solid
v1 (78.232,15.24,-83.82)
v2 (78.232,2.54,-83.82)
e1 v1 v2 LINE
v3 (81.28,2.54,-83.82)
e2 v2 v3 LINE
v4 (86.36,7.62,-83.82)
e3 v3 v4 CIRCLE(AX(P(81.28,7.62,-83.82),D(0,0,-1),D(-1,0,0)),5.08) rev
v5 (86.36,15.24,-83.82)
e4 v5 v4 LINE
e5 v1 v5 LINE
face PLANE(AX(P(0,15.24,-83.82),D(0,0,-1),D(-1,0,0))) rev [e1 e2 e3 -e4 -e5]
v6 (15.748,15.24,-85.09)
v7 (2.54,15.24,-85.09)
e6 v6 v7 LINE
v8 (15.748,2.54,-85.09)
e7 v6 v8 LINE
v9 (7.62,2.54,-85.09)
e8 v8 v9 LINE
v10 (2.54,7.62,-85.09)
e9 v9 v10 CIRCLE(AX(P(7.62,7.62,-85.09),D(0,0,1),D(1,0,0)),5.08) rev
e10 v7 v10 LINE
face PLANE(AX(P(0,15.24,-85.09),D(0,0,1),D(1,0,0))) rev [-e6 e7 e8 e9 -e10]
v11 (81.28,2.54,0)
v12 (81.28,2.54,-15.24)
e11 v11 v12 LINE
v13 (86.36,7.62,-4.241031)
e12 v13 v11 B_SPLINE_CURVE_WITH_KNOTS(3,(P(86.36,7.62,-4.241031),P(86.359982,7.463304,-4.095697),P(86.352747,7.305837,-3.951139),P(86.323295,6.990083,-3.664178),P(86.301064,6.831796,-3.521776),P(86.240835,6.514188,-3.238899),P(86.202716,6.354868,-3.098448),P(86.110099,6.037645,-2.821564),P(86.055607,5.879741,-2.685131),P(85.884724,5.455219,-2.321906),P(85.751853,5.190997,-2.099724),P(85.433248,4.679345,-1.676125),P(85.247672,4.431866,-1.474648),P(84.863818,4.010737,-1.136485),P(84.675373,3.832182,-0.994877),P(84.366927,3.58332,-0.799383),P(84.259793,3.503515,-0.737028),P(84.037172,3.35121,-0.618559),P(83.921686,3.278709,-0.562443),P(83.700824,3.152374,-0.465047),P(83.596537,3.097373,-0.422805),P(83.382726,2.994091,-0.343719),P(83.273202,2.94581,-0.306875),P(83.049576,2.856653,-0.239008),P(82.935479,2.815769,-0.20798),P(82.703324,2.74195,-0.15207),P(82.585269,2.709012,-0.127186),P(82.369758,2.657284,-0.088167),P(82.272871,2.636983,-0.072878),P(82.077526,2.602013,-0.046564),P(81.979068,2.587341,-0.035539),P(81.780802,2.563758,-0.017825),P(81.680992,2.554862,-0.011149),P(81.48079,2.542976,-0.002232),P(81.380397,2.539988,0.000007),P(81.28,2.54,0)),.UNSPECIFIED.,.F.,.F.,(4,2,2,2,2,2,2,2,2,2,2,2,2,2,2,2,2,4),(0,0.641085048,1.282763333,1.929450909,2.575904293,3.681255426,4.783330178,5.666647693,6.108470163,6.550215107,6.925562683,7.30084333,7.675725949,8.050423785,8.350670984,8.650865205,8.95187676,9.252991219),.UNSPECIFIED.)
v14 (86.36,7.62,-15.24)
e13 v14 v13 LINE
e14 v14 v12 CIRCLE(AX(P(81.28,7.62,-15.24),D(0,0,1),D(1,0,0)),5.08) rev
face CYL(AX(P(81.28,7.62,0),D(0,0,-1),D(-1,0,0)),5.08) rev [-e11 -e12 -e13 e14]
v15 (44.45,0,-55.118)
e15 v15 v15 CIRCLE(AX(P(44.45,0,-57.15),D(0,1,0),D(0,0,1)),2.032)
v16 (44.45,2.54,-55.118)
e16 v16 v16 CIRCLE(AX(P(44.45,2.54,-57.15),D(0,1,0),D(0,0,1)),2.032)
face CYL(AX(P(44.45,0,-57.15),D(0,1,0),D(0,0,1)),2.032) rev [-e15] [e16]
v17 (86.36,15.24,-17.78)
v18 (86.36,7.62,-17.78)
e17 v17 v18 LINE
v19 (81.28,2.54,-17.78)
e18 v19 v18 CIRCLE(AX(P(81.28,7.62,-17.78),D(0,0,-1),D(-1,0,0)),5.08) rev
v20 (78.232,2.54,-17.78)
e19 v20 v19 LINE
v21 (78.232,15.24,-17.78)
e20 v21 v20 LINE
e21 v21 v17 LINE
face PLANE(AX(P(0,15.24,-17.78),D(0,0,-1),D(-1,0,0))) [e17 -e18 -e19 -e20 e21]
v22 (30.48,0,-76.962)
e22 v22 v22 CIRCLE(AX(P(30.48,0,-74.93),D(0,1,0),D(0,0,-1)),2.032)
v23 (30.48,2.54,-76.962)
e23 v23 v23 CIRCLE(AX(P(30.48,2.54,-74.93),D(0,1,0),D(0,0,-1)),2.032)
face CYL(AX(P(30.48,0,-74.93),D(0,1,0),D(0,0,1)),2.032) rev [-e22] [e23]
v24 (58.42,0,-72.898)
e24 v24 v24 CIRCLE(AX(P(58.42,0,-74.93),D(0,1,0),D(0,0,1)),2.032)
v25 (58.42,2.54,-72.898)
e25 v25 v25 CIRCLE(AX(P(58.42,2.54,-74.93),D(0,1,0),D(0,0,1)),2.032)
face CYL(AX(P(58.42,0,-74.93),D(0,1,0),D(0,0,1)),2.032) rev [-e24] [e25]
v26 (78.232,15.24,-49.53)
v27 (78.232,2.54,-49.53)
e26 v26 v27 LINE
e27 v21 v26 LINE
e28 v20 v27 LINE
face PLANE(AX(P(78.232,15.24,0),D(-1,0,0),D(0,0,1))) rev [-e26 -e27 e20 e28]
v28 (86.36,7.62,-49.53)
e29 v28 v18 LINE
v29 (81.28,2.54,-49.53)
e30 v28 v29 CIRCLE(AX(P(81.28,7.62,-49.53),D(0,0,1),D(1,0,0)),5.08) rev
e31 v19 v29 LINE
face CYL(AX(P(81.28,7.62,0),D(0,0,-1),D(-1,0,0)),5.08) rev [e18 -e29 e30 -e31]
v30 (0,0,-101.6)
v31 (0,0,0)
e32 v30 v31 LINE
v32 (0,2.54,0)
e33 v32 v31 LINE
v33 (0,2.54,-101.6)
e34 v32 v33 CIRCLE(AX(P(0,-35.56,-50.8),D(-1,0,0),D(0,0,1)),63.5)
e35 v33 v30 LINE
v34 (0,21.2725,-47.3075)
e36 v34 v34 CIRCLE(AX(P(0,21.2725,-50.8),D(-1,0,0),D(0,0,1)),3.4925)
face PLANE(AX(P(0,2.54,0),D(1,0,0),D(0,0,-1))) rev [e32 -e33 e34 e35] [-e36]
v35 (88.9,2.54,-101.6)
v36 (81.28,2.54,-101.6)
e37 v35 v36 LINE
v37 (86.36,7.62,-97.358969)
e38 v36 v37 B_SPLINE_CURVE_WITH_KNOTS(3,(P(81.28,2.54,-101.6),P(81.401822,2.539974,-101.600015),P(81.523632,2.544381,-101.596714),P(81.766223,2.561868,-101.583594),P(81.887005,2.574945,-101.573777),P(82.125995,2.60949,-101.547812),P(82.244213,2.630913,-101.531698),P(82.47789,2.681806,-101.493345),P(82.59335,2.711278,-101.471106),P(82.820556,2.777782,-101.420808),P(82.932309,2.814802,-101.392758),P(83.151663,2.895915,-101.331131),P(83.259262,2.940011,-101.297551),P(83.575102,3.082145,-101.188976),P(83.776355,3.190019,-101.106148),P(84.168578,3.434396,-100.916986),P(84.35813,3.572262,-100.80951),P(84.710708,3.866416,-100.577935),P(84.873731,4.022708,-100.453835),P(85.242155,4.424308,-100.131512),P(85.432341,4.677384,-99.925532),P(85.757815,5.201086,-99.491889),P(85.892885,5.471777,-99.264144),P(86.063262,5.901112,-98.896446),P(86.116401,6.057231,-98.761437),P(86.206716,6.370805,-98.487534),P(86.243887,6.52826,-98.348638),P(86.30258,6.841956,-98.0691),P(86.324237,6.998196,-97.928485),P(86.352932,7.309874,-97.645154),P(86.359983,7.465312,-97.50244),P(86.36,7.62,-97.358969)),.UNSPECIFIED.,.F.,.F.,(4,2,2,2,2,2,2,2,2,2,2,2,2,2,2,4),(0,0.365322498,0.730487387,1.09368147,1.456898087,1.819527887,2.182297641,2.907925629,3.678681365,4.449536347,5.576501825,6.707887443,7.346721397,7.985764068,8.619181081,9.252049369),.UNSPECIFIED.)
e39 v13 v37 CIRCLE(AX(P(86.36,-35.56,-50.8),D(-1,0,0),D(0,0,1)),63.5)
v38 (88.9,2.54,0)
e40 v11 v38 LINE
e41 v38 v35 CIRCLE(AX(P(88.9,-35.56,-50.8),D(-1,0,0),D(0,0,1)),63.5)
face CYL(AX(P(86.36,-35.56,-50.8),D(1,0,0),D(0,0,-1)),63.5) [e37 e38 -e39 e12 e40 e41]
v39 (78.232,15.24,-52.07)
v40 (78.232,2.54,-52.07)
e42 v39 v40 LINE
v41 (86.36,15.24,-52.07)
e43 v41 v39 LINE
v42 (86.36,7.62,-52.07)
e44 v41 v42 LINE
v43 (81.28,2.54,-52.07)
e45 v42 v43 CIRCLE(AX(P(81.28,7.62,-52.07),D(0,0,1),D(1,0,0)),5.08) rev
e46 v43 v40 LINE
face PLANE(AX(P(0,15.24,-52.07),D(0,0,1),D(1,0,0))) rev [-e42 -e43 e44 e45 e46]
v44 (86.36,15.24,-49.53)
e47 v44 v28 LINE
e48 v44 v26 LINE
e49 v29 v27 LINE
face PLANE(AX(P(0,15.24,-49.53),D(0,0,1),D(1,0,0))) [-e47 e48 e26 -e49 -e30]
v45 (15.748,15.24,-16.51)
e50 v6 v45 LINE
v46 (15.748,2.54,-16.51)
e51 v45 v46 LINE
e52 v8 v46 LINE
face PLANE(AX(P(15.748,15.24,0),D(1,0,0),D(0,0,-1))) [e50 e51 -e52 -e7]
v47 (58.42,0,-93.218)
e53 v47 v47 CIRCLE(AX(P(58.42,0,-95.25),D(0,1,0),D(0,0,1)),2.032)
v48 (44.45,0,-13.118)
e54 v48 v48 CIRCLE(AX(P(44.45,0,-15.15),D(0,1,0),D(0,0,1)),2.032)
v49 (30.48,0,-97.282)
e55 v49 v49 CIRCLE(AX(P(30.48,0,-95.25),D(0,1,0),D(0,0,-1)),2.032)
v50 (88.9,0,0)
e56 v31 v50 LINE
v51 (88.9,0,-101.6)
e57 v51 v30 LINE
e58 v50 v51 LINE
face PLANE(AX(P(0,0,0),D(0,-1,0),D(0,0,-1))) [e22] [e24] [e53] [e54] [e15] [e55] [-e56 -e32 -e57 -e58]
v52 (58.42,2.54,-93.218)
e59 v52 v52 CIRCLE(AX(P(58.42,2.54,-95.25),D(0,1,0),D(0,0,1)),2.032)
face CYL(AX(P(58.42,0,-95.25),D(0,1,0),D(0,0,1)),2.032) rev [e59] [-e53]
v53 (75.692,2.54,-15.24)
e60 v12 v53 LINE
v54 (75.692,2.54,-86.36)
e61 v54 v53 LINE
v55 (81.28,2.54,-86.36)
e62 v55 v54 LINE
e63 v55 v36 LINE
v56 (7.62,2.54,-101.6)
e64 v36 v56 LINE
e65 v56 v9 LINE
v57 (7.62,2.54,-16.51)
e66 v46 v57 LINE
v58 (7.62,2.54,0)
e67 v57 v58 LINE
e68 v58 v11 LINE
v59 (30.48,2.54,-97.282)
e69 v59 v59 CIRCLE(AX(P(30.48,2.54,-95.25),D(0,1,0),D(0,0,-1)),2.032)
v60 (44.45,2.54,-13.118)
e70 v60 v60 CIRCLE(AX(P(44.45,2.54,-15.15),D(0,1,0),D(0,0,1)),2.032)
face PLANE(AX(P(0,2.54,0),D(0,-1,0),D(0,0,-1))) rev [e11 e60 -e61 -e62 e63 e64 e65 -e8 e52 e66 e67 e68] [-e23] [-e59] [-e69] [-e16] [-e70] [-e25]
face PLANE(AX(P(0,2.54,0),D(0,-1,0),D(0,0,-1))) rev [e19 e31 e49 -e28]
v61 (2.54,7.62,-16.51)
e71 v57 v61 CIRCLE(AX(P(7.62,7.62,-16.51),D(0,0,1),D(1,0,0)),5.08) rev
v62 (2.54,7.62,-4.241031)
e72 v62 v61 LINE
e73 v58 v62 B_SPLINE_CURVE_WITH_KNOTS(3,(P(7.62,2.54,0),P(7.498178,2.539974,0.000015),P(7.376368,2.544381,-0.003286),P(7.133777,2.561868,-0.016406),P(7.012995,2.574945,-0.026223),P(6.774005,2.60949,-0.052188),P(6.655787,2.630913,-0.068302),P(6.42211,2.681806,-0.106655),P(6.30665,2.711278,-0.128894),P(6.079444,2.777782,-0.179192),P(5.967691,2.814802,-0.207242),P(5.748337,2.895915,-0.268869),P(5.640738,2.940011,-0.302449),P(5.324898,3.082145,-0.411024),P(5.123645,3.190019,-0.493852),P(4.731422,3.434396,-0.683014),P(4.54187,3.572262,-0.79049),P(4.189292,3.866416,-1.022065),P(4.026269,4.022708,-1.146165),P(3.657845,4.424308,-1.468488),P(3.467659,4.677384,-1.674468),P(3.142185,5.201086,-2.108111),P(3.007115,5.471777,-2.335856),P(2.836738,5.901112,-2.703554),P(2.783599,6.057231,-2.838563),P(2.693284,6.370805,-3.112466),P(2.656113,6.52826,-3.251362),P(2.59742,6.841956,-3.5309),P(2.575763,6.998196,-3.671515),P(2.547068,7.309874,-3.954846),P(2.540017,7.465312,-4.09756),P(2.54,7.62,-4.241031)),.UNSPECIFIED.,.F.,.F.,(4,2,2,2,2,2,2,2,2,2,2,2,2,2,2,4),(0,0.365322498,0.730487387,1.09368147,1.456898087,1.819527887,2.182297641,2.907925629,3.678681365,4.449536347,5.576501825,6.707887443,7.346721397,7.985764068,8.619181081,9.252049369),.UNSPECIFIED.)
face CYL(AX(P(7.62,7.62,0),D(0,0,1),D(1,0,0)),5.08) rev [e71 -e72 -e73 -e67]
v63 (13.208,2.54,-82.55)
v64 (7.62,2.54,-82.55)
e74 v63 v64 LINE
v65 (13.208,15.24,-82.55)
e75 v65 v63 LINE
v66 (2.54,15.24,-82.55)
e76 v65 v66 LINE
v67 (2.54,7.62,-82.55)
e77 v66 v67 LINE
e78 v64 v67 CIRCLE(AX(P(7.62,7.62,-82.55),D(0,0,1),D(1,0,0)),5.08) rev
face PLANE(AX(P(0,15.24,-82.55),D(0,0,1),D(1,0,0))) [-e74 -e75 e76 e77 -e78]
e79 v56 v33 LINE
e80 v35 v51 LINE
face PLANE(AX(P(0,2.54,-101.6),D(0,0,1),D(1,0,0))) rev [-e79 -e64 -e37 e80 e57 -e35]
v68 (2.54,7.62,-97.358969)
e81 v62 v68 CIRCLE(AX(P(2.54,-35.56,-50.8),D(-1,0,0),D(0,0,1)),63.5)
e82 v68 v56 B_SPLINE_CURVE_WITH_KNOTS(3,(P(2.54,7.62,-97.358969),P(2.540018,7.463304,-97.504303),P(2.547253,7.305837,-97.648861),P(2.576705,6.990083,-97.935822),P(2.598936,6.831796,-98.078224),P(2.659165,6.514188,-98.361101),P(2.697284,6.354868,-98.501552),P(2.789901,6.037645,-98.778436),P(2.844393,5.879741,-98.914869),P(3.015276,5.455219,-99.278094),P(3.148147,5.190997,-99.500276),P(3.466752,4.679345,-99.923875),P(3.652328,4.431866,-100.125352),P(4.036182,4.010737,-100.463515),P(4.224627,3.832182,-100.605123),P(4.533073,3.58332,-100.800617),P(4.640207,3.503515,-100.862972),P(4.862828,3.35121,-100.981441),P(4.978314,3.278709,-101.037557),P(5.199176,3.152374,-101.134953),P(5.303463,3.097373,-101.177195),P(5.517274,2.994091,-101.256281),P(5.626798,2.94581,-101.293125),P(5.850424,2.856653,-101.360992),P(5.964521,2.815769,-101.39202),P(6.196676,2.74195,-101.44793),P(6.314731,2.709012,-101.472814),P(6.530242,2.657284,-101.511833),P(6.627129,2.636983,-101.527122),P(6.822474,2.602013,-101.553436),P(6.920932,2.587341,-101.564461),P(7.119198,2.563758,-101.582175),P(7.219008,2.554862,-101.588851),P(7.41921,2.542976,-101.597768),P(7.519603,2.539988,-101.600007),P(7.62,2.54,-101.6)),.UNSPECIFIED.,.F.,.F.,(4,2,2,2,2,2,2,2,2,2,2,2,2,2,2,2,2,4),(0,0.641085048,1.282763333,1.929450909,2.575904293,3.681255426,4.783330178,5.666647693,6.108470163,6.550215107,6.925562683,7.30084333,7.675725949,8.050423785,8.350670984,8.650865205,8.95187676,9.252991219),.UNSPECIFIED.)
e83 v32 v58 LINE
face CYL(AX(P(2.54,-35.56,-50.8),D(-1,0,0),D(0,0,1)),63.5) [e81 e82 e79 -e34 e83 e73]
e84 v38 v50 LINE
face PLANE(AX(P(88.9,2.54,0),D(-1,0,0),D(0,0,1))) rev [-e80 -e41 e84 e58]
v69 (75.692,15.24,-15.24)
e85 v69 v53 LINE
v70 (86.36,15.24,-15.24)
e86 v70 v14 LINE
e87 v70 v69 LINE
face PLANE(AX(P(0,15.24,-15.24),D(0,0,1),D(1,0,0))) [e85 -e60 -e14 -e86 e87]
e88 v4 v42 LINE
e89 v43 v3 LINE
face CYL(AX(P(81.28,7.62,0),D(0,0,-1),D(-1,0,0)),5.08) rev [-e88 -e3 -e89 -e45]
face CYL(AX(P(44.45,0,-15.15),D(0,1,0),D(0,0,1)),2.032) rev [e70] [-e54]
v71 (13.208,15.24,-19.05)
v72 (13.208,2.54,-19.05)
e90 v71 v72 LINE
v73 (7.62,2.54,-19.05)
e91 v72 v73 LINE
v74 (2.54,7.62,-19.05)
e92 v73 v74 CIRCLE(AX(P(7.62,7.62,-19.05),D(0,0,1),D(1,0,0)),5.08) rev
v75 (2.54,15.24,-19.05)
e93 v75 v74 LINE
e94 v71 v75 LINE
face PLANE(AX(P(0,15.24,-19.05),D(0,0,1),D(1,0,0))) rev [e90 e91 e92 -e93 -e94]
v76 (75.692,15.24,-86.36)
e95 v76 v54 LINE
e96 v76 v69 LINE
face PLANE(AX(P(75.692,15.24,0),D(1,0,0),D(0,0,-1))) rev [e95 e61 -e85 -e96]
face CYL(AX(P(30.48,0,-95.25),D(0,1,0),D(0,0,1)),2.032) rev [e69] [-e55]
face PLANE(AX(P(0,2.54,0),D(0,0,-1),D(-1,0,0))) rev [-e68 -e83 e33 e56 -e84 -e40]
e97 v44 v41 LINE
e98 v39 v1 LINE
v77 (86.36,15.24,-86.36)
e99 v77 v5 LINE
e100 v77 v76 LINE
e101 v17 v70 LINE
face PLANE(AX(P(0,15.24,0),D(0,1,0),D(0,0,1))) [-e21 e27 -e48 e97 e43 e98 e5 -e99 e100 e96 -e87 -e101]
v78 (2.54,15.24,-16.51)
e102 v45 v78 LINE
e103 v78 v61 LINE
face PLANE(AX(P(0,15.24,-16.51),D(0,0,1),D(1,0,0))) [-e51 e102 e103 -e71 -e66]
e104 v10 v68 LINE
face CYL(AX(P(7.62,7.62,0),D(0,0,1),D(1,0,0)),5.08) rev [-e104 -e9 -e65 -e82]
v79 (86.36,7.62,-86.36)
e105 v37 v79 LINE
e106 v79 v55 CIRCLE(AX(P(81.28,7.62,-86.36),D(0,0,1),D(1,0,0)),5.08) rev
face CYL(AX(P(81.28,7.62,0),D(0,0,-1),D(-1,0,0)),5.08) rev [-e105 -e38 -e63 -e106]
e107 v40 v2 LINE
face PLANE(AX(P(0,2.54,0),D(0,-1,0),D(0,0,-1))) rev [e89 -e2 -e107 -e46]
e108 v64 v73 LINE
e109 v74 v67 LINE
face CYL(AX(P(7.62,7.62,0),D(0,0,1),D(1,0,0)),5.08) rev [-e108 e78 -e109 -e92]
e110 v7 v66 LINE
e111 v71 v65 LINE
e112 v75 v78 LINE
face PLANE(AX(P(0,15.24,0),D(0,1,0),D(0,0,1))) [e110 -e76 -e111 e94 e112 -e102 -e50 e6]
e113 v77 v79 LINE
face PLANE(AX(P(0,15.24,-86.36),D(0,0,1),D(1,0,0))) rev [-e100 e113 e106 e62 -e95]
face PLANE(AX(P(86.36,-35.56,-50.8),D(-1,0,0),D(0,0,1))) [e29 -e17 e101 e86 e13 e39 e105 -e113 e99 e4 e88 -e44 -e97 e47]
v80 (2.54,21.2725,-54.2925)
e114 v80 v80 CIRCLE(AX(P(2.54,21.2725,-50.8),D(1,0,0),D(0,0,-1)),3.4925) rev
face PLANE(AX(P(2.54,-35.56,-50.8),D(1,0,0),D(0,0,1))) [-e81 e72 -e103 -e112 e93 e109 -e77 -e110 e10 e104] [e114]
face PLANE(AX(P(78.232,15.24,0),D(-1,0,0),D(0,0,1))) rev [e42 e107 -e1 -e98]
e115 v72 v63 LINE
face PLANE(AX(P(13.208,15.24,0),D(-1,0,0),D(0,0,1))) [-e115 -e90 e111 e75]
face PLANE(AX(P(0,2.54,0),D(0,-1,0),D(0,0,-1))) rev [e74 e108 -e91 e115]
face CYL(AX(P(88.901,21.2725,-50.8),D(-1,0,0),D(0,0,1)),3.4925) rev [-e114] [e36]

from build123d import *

# Parameters (mm, degrees)
SKETCH1_W           = 88.9
SKETCH1_H           = 101.6
BASE_EXTRUDE_DEPTH  = 2.54
WALL_EXTRUDE_DEPTH  = 2.54
CUT_EXTRUDE1_REACH  = 139.864
SKETCH3_R           = 3.4925
FILLET2_R           = 5.08
SKETCH4_R           = 2.032
CUT_EXTRUDE2_DEPTH  = 138.371503752
SKETCH5_W           = 2.54
SKETCH5_H           = 2.54
SKETCH5_W_2         = 5.08
SKETCH5_W_3         = 3.048
BOSS_EXTRUDE1_DEPTH = 12.7


with BuildPart() as part:
    # Sketch1 → Base Extrude (new body)
    with BuildSketch(Plane(origin=(0, 0, 0), x_dir=(1, 0, 0), z_dir=(0, 1, 0))):
        with Locations((44.45, 50.8)):
            Rectangle(SKETCH1_W, SKETCH1_H)
    extrude(amount=BASE_EXTRUDE_DEPTH)

    # Sketch2 → Wall Extrude (add)
    with BuildSketch(Plane(origin=(88.9, 0, 0), x_dir=(0, 0, -1), z_dir=(1, 0, 0))):
        with BuildLine():
            Line((101.6, 2.54), (101.6, 0))
            Line((101.6, 0), (0, 0))
            Line((0, 0), (0, 2.54))
            ThreePointArc((0, 2.54), (50.8, 27.94), (101.6, 2.54))
        make_face()
    wall_extrude = extrude(amount=-WALL_EXTRUDE_DEPTH)

    # Wall Mirror: Wall Extrude across plane
    add(wall_extrude.mirror(Plane(origin=(44.45, 0, 0), x_dir=(0, 0, 1), z_dir=(1, 0, 0))))

    # Sketch3 → Cut-Extrude1 (cut, up to next)
    with BuildSketch(Plane.ZY, mode=Mode.PRIVATE) as cut_extrude1_sk1:
        with Locations((-50.8, 21.2725)):
            Circle(SKETCH3_R)
    cut_extrude1_tool1 = extrude(cut_extrude1_sk1.sketch, amount=-CUT_EXTRUDE1_REACH, mode=Mode.PRIVATE) & part.part
    add(cut_extrude1_tool1.solids().sort_by_distance((0, 21.2725, -50.8))[0], mode=Mode.SUBTRACT)

    # Fillet2
    # the kernel refuses this fillet: 5.08 mm, written as the material it adds along each edge
    with BuildSketch(Plane(origin=(86.36, 2.54, -101.6), x_dir=(-1, 0, 0), z_dir=(0, 0, 1))) as fillet2_piece_1_section:
        with BuildLine():
            CenterArc((FILLET2_R, -FILLET2_R), FILLET2_R, 90, 90)
            Line((0, -FILLET2_R), (0, 0))
            Line((0, 0), (FILLET2_R, 0))
        make_face()
    fillet2_piece_1 = extrude(amount=101.6, mode=Mode.PRIVATE)
    fillet2_piece_1 = fillet2_piece_1 & Plane(origin=(85.198656014, -35.56, -50.8), x_dir=(0, 0.6000000000000003, 0.7999999999999998), z_dir=(1, 0, 0)) * Cylinder(63.5, 224, mode=Mode.PRIVATE)
    add(fillet2_piece_1)
    with BuildSketch(Plane(origin=(2.54, 2.54, -101.6), x_dir=(1, 0, 0), z_dir=(0, 0, 1))) as fillet2_piece_2_section:
        with BuildLine():
            CenterArc((FILLET2_R, FILLET2_R), FILLET2_R, 180, 90)
            Line((0, FILLET2_R), (0, 0))
            Line((0, 0), (FILLET2_R, 0))
        make_face()
    fillet2_piece_2 = extrude(amount=101.6, mode=Mode.PRIVATE)
    fillet2_piece_2 = fillet2_piece_2 & Plane(origin=(3.701343986, -35.56, -50.8), x_dir=(0, 0.6000000000000003, 0.7999999999999998), z_dir=(-1, 0, 0)) * Cylinder(63.5, 224, mode=Mode.PRIVATE)
    add(fillet2_piece_2)

    # Sketch4 → Cut-Extrude2 (cut, through all)
    with BuildSketch(Plane(origin=(0, 2.54, 0), x_dir=(1, 0, 0), z_dir=(0, 1, 0))):
        with Locations(Location((44.45, 57.15, 0), (0, 0, 270))):
            Circle(SKETCH4_R)
        with Locations(Location((44.45, 15.15, 0), (0, 0, 270))):
            Circle(SKETCH4_R)
        with Locations(Location((58.42, 74.93, 0), (0, 0, 270))):
            Circle(SKETCH4_R)
        with Locations(Location((58.42, 95.25, 0), (0, 0, 270))):
            Circle(SKETCH4_R)
        with Locations(Location((30.48, 74.93, 0), (0, 0, 90))):
            Circle(SKETCH4_R)
        with Locations(Location((30.48, 95.25, 0), (0, 0, 90))):
            Circle(SKETCH4_R)
    extrude(amount=-CUT_EXTRUDE2_DEPTH, mode=Mode.SUBTRACT)

    # Sketch5 → Boss-Extrude1 (add)
    with BuildSketch(Plane(origin=(0, 2.54, 0), x_dir=(1, 0, 0), z_dir=(0, 1, 0))):
        with Locations((87.63, 50.8)):
            Rectangle(SKETCH5_W, SKETCH5_H)
        Polygon((13.208, 82.55), (13.208, 19.05), (7.62, 19.05), (7.62, 16.51), (15.748, 16.51), (15.748, 85.09), (7.62, 85.09), (7.62, 82.55), align=None)
        with Locations((5.08, 17.78)):
            Rectangle(SKETCH5_W_2, SKETCH5_H)
        with Locations((5.08, 83.82)):
            Rectangle(SKETCH5_W_2, SKETCH5_H)
        Polygon((81.28, 83.82), (81.28, 86.36), (75.692, 86.36), (75.692, 52.07), (78.232, 52.07), (78.232, 83.82), align=None)
        Polygon((78.232, 49.53), (75.692, 49.53), (75.692, 15.24), (81.28, 15.24), (81.28, 17.78), (78.232, 17.78), align=None)
        with Locations((83.82, 50.8)):
            Rectangle(SKETCH5_W_2, SKETCH5_H)
        with Locations((79.756, 50.8)):
            Rectangle(SKETCH5_W_3, SKETCH5_H)
        with Locations((76.962, 50.8)):
            Rectangle(SKETCH5_W, SKETCH5_H)
        with Locations((83.82, 85.09)):
            Rectangle(SKETCH5_W_2, SKETCH5_H)
        with Locations((83.82, 16.51)):
            Rectangle(SKETCH5_W_2, SKETCH5_H)
    extrude(amount=BOSS_EXTRUDE1_DEPTH)


solid = part.part
